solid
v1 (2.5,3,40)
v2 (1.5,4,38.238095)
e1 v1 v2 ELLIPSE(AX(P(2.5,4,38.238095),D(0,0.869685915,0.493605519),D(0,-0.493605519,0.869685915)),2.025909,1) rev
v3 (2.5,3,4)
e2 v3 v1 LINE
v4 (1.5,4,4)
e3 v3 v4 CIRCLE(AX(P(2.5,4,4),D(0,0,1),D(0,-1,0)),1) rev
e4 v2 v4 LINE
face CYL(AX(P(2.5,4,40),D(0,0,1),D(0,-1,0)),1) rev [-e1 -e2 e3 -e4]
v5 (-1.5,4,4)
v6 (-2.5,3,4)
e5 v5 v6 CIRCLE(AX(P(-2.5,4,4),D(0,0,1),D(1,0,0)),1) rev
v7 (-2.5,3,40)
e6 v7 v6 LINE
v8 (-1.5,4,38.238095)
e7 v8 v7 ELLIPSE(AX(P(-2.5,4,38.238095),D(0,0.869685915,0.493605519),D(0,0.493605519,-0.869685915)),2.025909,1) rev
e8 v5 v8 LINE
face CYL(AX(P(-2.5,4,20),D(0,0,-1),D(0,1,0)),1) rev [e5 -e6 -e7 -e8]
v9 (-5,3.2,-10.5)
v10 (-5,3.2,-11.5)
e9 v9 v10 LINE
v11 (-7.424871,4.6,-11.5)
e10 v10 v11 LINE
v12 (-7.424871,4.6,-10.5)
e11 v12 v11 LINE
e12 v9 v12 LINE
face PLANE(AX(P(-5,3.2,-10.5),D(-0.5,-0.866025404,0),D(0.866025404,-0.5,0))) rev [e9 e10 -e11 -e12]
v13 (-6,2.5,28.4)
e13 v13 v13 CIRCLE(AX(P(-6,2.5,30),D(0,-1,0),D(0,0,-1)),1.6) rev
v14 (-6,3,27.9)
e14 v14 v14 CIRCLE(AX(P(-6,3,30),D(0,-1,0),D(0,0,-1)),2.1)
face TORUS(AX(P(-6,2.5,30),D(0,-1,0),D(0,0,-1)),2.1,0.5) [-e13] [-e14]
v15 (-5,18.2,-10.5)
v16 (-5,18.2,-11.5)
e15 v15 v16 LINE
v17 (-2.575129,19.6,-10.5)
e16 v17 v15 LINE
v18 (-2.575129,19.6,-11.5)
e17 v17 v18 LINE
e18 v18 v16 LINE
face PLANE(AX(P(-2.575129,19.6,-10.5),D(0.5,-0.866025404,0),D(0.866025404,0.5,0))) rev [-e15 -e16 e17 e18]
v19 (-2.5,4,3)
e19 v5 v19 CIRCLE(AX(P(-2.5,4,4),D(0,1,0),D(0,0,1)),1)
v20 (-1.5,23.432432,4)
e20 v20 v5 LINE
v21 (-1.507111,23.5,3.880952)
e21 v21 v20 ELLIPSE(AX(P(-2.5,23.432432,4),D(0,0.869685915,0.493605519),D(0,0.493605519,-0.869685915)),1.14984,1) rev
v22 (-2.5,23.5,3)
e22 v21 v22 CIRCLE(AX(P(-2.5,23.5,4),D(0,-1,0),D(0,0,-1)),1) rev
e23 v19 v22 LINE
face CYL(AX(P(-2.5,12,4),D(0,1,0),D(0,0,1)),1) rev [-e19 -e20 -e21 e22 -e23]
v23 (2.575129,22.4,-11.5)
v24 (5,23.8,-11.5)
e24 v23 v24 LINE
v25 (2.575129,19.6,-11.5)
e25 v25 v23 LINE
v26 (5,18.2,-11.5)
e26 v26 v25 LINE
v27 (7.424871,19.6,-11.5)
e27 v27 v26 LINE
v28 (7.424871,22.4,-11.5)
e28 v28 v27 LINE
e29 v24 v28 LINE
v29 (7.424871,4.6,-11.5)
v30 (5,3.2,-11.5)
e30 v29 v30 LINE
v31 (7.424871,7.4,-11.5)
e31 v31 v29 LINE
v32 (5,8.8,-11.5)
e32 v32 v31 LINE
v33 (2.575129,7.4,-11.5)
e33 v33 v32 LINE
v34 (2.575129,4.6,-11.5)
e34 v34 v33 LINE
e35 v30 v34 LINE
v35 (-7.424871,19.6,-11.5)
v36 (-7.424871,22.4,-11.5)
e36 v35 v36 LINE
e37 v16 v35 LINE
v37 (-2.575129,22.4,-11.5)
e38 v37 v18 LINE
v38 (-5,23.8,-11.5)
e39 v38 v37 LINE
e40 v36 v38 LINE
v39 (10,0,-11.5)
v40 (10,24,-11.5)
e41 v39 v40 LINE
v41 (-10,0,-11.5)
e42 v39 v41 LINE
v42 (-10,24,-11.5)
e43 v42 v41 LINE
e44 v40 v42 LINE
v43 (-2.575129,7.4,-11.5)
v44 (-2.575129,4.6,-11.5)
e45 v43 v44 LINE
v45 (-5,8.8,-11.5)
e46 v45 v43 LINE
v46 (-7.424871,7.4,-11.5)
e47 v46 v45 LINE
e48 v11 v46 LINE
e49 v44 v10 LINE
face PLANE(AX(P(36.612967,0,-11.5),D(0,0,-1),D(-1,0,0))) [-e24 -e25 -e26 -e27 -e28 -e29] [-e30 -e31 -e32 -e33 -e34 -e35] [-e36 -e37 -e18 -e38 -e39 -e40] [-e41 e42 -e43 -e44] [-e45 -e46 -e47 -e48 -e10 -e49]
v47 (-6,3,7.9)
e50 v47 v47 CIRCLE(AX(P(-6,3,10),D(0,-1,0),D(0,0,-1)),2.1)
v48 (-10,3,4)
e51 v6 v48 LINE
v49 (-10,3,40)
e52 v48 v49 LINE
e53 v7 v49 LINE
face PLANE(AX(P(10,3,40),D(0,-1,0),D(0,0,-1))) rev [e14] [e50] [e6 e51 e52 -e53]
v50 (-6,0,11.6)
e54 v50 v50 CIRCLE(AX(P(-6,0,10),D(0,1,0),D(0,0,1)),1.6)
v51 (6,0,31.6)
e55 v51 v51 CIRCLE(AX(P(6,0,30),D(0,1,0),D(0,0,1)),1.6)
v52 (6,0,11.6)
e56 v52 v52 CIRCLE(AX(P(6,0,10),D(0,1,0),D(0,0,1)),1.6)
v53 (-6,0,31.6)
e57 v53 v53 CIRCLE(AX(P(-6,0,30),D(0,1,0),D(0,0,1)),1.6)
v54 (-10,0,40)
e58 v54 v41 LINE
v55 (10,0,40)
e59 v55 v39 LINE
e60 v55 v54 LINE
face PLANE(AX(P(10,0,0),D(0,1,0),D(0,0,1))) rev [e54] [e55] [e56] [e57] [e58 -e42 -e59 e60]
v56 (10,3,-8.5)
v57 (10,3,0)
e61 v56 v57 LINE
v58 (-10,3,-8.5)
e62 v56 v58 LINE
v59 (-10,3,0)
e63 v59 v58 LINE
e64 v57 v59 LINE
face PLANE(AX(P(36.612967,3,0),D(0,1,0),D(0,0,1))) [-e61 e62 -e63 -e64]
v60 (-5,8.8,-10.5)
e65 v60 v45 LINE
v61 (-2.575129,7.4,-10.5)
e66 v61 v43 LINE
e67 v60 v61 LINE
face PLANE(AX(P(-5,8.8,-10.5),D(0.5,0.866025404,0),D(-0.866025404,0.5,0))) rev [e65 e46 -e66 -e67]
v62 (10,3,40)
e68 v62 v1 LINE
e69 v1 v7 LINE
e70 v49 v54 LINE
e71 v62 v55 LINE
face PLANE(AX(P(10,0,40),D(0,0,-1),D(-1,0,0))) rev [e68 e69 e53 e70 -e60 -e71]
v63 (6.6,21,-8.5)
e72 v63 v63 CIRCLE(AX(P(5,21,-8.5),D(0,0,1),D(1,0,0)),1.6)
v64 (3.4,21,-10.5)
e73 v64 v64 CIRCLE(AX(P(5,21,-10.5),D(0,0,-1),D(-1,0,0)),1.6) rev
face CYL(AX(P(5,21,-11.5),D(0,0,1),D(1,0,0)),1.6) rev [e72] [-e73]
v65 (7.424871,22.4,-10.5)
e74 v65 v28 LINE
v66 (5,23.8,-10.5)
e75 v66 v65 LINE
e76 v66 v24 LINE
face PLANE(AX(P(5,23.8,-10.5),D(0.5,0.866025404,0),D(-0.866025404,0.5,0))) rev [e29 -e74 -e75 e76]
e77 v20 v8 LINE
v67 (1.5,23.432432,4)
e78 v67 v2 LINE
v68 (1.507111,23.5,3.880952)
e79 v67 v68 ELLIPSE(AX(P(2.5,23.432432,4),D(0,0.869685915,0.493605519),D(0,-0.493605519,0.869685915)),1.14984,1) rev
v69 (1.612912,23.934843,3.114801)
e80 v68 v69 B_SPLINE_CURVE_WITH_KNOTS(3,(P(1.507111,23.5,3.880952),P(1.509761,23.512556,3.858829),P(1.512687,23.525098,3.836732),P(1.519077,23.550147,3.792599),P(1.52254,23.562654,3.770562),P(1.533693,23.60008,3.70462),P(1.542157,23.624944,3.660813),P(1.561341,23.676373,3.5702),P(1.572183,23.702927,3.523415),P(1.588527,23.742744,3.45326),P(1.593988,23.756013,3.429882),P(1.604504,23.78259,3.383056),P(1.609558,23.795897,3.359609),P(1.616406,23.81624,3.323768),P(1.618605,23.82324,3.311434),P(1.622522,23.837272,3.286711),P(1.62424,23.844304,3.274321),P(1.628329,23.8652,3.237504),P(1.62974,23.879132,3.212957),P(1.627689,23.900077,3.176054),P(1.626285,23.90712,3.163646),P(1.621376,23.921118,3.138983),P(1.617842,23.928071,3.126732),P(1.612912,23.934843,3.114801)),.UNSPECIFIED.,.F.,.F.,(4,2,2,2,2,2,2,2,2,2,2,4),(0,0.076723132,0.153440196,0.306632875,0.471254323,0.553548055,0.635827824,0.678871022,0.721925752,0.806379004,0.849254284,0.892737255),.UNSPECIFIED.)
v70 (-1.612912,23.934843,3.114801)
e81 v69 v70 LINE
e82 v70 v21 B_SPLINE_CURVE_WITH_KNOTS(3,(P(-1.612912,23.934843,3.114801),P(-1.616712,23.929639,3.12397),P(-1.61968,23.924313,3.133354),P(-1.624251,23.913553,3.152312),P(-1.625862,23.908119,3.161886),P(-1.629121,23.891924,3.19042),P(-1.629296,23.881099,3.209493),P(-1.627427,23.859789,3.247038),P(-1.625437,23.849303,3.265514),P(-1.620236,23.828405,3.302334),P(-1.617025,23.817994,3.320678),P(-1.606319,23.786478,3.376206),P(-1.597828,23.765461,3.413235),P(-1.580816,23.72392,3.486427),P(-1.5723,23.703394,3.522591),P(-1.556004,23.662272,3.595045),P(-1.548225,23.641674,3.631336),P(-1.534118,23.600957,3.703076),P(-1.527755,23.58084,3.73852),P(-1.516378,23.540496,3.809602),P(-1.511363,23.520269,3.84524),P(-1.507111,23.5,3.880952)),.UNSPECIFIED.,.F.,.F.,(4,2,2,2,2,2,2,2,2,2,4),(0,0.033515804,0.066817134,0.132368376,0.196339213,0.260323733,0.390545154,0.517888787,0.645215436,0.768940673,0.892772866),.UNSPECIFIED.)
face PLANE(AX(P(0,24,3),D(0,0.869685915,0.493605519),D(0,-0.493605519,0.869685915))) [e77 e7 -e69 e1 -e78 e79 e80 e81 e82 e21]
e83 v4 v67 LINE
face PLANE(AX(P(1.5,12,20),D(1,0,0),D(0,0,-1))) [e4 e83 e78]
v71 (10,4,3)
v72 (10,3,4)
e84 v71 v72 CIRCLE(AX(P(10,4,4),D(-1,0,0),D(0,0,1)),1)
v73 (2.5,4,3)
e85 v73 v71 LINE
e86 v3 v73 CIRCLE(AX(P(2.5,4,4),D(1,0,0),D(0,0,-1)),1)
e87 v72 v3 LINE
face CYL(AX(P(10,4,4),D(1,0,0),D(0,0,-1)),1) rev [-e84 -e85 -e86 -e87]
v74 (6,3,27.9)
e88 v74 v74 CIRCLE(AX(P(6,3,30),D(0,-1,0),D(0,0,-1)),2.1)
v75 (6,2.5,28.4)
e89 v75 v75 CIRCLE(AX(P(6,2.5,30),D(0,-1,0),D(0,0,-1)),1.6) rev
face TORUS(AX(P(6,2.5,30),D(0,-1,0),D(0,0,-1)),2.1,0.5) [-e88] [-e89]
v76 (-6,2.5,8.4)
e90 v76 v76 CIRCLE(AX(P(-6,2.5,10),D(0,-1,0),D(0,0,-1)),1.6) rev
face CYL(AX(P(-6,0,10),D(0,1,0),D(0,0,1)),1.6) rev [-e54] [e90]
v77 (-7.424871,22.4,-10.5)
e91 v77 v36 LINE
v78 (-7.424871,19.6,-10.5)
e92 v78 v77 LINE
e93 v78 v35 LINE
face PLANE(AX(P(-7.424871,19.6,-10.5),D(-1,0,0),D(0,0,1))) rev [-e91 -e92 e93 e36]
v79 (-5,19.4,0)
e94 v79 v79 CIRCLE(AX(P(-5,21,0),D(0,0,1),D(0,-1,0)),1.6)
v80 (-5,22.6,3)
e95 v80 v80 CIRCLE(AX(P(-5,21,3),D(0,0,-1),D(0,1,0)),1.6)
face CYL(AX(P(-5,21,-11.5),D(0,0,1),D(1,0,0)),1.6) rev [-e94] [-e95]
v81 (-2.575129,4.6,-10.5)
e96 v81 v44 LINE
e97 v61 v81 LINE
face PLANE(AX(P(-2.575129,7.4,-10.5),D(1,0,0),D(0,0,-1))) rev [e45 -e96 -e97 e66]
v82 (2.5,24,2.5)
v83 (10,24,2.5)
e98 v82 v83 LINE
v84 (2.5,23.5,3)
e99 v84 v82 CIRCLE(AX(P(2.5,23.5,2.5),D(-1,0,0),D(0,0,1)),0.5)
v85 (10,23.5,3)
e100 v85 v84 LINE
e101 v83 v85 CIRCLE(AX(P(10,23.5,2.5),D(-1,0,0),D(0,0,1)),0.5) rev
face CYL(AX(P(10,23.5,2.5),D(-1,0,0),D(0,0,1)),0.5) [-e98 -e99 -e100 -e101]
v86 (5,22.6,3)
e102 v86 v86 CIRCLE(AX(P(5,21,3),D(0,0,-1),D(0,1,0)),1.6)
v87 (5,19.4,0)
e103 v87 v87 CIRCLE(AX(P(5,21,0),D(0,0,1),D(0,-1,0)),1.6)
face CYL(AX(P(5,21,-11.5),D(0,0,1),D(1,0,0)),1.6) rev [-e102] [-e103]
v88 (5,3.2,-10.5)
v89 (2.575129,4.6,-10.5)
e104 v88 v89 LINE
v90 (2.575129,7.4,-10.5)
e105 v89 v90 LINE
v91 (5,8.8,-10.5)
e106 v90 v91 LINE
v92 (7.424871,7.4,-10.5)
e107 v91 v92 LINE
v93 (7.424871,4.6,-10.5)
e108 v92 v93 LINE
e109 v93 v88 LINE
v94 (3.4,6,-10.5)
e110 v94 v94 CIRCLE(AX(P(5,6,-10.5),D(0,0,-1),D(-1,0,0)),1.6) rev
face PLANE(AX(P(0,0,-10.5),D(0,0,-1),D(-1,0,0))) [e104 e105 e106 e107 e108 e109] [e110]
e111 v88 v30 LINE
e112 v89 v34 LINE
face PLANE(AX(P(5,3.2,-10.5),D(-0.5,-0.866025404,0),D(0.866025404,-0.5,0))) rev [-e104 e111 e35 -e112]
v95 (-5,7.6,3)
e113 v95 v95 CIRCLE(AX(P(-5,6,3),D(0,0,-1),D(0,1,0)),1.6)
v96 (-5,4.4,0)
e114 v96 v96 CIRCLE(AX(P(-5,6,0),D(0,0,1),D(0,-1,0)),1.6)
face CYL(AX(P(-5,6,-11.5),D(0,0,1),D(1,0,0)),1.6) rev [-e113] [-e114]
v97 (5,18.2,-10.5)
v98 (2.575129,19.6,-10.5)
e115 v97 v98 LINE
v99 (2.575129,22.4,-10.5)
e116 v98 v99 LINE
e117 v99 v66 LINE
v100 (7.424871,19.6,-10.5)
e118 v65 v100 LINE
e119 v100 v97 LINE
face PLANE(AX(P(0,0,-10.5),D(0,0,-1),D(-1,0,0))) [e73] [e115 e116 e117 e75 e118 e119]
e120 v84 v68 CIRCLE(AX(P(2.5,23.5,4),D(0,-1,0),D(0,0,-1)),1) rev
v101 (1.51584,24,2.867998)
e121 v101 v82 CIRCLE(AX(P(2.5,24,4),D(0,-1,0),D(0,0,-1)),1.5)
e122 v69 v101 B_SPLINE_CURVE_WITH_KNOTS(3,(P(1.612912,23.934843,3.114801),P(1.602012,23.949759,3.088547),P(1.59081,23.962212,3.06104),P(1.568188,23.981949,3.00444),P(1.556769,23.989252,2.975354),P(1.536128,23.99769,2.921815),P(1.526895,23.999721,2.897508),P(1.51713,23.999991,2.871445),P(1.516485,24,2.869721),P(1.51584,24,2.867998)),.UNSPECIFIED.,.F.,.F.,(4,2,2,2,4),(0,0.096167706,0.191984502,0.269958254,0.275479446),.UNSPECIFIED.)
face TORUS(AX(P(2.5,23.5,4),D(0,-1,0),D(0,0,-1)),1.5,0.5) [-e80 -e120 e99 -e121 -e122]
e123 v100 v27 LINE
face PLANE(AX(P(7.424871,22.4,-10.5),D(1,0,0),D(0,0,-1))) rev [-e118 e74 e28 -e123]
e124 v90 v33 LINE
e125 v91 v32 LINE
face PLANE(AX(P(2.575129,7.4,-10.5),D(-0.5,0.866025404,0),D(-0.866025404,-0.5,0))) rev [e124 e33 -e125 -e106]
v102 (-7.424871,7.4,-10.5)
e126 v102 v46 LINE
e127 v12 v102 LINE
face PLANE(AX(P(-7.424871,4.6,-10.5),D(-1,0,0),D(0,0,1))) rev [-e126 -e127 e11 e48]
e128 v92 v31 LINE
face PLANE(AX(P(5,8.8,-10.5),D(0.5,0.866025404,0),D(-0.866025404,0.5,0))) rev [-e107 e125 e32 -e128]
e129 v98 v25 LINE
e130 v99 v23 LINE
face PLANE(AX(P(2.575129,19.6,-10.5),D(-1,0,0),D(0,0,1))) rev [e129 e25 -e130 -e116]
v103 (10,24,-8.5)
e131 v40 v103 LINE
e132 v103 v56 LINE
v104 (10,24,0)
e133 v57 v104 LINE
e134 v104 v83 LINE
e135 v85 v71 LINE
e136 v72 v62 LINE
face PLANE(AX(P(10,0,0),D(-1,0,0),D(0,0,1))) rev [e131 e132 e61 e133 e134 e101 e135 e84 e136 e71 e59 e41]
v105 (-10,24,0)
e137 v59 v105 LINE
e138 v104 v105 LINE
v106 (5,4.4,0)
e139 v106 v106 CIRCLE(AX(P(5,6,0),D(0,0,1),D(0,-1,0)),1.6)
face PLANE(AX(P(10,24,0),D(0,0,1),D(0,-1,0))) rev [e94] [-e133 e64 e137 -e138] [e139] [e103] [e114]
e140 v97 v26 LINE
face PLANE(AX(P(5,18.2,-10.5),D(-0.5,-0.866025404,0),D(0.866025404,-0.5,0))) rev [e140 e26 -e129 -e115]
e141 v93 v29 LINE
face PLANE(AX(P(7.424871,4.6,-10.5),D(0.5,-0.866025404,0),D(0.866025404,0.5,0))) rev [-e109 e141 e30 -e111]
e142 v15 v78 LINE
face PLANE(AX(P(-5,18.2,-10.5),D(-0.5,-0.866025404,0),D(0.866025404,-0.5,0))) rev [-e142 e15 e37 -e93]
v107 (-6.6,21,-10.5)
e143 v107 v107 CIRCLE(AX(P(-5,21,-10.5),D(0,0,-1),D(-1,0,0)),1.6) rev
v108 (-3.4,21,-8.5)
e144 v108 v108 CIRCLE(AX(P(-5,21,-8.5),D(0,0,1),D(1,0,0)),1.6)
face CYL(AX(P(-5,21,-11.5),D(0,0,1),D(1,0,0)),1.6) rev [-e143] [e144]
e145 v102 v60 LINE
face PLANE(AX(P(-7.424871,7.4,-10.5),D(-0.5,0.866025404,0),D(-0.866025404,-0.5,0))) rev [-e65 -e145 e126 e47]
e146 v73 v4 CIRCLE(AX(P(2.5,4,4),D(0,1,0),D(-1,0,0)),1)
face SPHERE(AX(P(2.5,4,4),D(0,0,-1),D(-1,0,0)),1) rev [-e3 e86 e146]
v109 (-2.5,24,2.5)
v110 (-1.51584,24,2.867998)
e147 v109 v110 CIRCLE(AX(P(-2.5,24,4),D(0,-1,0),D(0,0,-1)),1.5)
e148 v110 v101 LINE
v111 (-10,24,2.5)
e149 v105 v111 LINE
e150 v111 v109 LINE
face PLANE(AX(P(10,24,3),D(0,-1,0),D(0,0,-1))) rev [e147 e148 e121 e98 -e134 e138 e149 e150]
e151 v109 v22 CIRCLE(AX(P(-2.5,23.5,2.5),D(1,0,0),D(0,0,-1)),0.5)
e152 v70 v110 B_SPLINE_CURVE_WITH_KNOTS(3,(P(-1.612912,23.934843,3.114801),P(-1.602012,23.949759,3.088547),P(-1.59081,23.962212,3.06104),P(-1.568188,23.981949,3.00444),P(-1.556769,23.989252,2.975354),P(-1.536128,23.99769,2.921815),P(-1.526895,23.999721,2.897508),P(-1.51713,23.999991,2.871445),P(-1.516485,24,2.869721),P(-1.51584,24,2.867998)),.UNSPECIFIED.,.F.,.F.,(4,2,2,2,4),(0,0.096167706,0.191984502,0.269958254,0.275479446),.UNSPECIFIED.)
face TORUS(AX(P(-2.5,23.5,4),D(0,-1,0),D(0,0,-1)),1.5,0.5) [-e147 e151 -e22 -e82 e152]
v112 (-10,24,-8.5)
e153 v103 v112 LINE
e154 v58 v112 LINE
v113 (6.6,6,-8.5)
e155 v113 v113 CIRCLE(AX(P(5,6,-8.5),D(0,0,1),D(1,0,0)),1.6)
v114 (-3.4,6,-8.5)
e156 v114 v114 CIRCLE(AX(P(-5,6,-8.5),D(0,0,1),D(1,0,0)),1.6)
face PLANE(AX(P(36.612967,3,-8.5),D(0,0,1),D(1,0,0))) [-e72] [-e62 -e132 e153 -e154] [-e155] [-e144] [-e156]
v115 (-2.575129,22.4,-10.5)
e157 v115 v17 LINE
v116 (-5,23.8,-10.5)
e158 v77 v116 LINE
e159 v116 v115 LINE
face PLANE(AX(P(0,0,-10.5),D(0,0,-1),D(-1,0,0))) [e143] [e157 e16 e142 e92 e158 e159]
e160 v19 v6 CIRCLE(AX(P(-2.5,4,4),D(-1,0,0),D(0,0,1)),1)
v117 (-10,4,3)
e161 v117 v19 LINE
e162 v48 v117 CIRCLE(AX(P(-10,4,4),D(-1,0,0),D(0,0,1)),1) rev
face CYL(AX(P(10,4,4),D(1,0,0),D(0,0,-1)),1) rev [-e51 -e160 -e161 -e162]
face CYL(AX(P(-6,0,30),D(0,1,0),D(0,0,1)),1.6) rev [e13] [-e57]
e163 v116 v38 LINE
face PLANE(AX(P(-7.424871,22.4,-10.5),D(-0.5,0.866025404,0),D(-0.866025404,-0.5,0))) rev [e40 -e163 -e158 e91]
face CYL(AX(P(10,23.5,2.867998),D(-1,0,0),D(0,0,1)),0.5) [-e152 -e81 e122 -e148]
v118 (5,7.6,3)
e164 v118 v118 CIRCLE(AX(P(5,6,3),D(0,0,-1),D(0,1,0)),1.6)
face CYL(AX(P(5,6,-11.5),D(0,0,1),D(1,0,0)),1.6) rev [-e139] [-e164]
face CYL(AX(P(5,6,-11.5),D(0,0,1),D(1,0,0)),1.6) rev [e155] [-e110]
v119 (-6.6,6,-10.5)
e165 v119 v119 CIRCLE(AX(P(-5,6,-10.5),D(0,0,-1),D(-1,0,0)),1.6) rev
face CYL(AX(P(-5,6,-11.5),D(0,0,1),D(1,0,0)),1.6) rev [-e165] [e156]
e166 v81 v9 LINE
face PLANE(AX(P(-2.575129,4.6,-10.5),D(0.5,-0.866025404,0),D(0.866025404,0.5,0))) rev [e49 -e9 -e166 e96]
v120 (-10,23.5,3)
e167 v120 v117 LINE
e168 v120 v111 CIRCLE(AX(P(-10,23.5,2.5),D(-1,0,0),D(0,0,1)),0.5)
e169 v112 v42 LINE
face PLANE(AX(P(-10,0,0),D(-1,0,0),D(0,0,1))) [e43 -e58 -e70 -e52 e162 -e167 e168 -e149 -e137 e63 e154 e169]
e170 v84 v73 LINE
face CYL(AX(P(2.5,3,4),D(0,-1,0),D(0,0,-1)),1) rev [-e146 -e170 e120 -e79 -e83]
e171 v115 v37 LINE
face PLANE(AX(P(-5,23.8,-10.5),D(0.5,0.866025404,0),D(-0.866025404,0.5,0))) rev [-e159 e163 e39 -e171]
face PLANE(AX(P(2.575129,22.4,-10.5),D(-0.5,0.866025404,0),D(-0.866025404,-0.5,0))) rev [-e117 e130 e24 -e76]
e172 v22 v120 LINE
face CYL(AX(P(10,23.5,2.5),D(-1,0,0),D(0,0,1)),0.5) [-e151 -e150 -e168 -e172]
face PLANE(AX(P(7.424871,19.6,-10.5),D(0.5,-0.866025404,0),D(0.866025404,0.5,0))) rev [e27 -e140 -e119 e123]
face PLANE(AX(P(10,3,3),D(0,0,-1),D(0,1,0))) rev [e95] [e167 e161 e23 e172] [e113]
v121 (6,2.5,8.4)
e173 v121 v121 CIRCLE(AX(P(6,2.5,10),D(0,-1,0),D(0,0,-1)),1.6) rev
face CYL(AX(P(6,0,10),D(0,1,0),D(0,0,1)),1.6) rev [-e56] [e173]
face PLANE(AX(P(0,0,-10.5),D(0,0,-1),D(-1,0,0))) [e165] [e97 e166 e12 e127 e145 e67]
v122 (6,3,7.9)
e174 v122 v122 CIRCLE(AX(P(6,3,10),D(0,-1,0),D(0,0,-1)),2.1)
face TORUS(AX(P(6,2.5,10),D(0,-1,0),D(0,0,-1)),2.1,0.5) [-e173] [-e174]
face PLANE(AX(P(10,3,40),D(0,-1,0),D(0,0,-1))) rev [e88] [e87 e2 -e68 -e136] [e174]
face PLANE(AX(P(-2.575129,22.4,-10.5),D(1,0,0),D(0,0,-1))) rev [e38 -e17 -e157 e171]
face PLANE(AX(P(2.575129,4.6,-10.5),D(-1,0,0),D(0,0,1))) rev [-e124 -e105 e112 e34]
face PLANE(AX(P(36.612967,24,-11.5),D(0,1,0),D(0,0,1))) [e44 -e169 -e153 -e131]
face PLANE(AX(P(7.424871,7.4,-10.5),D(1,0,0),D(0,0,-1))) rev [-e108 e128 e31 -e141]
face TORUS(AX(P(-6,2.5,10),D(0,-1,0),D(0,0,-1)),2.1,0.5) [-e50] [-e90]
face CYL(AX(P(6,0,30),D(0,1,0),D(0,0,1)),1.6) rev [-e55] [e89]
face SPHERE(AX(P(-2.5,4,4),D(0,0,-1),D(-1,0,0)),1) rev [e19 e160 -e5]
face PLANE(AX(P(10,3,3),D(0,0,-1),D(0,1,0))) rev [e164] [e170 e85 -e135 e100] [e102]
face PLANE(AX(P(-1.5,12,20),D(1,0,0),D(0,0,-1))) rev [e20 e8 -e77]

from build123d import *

# Parameters (mm, degrees)
EXTRUDE_1_DEPTH          = 10
RIB_1_REACH              = 49.707
SKETCH_3_WALL_W          = 139.958978308
SKETCH_3_WALL_H          = 3
EXTRUDE_2_DEPTH          = 20
CUT_EXTRUDE_1_DEPTH      = 46.221676218
CUT_EXTRUDE_1_DEPTH_BACK = 46.221676218
SKETCH_4_R               = 1.6
FILLET_1_R               = 1
CUT_EXTRUDE_2_DEPTH      = 47.270941205
CUT_EXTRUDE_2_DEPTH_BACK = 47.270941205
SKETCH_6_R               = 1.6
FILLET_2_R               = 0.5
FILLET_START             = 2.5
FILLET_3_3_DEPTH         = 8.5
FILLET_START_2           = -11
FILLET_3_4_DEPTH         = 8.5
FILLET_START_3           = -2.5
FILLET_3_5_DEPTH         = 5
CUT_EXTRUDE_3_DEPTH      = 1


with BuildPart() as part:
    # 草图1 → 凸台-拉伸1 (new, symmetric)
    with BuildSketch(Plane(origin=(0, 0, 0), x_dir=(0, 0, -1), z_dir=(1, 0, 0))):
        Polygon((0, 24), (0, 0), (-40, 0), (-40, 3), (-3, 3), (-3, 24), align=None)
    extrude(amount=EXTRUDE_1_DEPTH, both=True)

    # 草图3 wall → 筋1 (add, up to next)
    with BuildSketch(Plane(origin=(0, 13.5, 21.5), x_dir=(0, -0.493605519458, 0.869685915236), z_dir=(0, -0.869685915236, -0.493605519458)), mode=Mode.PRIVATE) as rib_1_sk1:
        Rectangle(SKETCH_3_WALL_W, SKETCH_3_WALL_H)
    rib_1_tool1 = extrude(rib_1_sk1.sketch, amount=RIB_1_REACH, mode=Mode.PRIVATE) - part.part
    add(rib_1_tool1.solids().sort_by_distance((0, 13.5, 21.5))[0])

    # 草图5 → 凸台-拉伸2 (add)
    with BuildSketch(Plane.ZY.offset(10)):
        Polygon((0, 0), (-11.5, 0), (-11.5, 3), (-11.5, 24), (-8.5, 24), (-8.5, 3), (0, 3), align=None)
    extrude(amount=-EXTRUDE_2_DEPTH)

    # 草图4 → 切除-拉伸1 (cut, two sides: drawn at the far end of the back side and taken through both)
    with BuildSketch(Plane.XY.offset(3).offset(-CUT_EXTRUDE_1_DEPTH_BACK)):
        with Locations((-5, 21)):
            Circle(SKETCH_4_R)
        with Locations((-5, 6)):
            Circle(SKETCH_4_R)
        with Locations((5, 21)):
            Circle(SKETCH_4_R)
        with Locations((5, 6)):
            Circle(SKETCH_4_R)
    extrude(amount=CUT_EXTRUDE_1_DEPTH + CUT_EXTRUDE_1_DEPTH_BACK, mode=Mode.SUBTRACT)

    # 圆角1
    fillet_1_edges = [part.edges().sort_by_distance(p)[0] for p in [
        (5.75, 3, 3),
        (-5.75, 3, 3),
        (-1.5, 13.5, 3),
        (-1.5, 3, 21.5),
        (1.5, 13.5, 3),
        (1.5, 3, 21.5),
    ]]
    fillet(fillet_1_edges, radius=FILLET_1_R)

    # 草图6 → 切除-拉伸2 (cut, two sides: drawn at the far end of the back side and taken through both)
    with BuildSketch(Plane(origin=(0, 3, 0), x_dir=(1, 0, 0), z_dir=(0, 1, 0)).offset(-CUT_EXTRUDE_2_DEPTH_BACK)):
        with Locations(Location((-6, -10, 0), (0, 0, 270))):
            Circle(SKETCH_6_R)
        with Locations(Location((6, -10, 0), (0, 0, 270))):
            Circle(SKETCH_6_R)
        with Locations(Location((-6, -30, 0), (0, 0, 270))):
            Circle(SKETCH_6_R)
        with Locations(Location((6, -30, 0), (0, 0, 270))):
            Circle(SKETCH_6_R)
    extrude(amount=CUT_EXTRUDE_2_DEPTH + CUT_EXTRUDE_2_DEPTH_BACK, mode=Mode.SUBTRACT)

    # 圆角2
    fillet_2_edges = [part.edges().sort_by_distance(p)[0] for p in [
        (6, 3, 8.4),
        (-6, 3, 28.4),
        (6, 3, 28.4),
        (-6, 3, 8.4),
    ]]
    fillet(fillet_2_edges, radius=FILLET_2_R)

    # 圆角3: read off the stored shape, not the designer's step
    # 圆角3 outline → 圆角3 (revolve, cut)
    with BuildSketch(Plane(origin=(-2.5, 0, 4), x_dir=(1, 0, 0), z_dir=(0, 0, 1))):
        with BuildLine():
            Line((1, 24), (1, 23.5))
            ThreePointArc((1, 23.5), (1.146446609, 23.853553391), (1.5, 24))
            Line((1.5, 24), (1, 24))
        make_face()
    revolve(axis=Axis((-2.5, 0, 4), (0, 1, 0)), mode=Mode.SUBTRACT)

    # Fillet 3 2 outline → Fillet 3 2 (revolve, cut)
    with BuildSketch(Plane(origin=(2.5, 0, 4), x_dir=(1, 0, 0), z_dir=(0, 0, 1))):
        with BuildLine():
            Line((1, 24), (1, 23.5))
            ThreePointArc((1, 23.5), (1.146446609, 23.853553391), (1.5, 24))
            Line((1.5, 24), (1, 24))
        make_face()
    revolve(axis=Axis((2.5, 0, 4), (0, 1, 0)), mode=Mode.SUBTRACT)

    # Fillet 3 3 outline → Fillet 3 3 (cut)
    with BuildSketch(Plane.YZ.offset(FILLET_START)):
        with BuildLine():
            ThreePointArc((23.5, 3), (23.853553391, 2.853553391), (24, 2.5))
            Line((24, 2.5), (24, 3))
            Line((24, 3), (23.5, 3))
        make_face()
    extrude(amount=FILLET_3_3_DEPTH, mode=Mode.SUBTRACT)

    # Fillet 3 4 outline → Fillet 3 4 (cut)
    with BuildSketch(Plane.YZ.offset(FILLET_START_2)):
        with BuildLine():
            ThreePointArc((23.5, 3), (23.853553391, 2.853553391), (24, 2.5))
            Line((24, 2.5), (24, 3))
            Line((24, 3), (23.5, 3))
        make_face()
    extrude(amount=FILLET_3_4_DEPTH, mode=Mode.SUBTRACT)

    # Fillet 3 5 outline → Fillet 3 5 (cut)
    with BuildSketch(Plane.YZ.offset(FILLET_START_3)):
        with BuildLine():
            Line((24, 2.867997744), (24, 3))
            Line((24, 3), (23.934842958, 3.114800503))
            ThreePointArc((23.934842958, 3.114800503), (23.983436386, 2.995627131), (24, 2.867997744))
        make_face()
    extrude(amount=FILLET_3_5_DEPTH, mode=Mode.SUBTRACT)

    # 草图7 → 切除-拉伸3 (cut)
    with BuildSketch(Plane(origin=(0, 0, -11.5), x_dir=(-1, 0, 0), z_dir=(0, 0, -1))):
        Polygon((-5, 8.8), (-7.424871131, 7.4), (-7.424871131, 4.6), (-5, 3.2), (-2.575128869, 4.6), (-2.575128869, 7.4), align=None)
        Polygon((-5, 23.8), (-7.424871131, 22.4), (-7.424871131, 19.6), (-5, 18.2), (-2.575128869, 19.6), (-2.575128869, 22.4), align=None)
        Polygon((5, 23.8), (2.575128869, 22.4), (2.575128869, 19.6), (5, 18.2), (7.424871131, 19.6), (7.424871131, 22.4), align=None)
        Polygon((5, 8.8), (2.575128869, 7.4), (2.575128869, 4.6), (5, 3.2), (7.424871131, 4.6), (7.424871131, 7.4), align=None)
    extrude(amount=-CUT_EXTRUDE_3_DEPTH, mode=Mode.SUBTRACT)


solid = part.part
